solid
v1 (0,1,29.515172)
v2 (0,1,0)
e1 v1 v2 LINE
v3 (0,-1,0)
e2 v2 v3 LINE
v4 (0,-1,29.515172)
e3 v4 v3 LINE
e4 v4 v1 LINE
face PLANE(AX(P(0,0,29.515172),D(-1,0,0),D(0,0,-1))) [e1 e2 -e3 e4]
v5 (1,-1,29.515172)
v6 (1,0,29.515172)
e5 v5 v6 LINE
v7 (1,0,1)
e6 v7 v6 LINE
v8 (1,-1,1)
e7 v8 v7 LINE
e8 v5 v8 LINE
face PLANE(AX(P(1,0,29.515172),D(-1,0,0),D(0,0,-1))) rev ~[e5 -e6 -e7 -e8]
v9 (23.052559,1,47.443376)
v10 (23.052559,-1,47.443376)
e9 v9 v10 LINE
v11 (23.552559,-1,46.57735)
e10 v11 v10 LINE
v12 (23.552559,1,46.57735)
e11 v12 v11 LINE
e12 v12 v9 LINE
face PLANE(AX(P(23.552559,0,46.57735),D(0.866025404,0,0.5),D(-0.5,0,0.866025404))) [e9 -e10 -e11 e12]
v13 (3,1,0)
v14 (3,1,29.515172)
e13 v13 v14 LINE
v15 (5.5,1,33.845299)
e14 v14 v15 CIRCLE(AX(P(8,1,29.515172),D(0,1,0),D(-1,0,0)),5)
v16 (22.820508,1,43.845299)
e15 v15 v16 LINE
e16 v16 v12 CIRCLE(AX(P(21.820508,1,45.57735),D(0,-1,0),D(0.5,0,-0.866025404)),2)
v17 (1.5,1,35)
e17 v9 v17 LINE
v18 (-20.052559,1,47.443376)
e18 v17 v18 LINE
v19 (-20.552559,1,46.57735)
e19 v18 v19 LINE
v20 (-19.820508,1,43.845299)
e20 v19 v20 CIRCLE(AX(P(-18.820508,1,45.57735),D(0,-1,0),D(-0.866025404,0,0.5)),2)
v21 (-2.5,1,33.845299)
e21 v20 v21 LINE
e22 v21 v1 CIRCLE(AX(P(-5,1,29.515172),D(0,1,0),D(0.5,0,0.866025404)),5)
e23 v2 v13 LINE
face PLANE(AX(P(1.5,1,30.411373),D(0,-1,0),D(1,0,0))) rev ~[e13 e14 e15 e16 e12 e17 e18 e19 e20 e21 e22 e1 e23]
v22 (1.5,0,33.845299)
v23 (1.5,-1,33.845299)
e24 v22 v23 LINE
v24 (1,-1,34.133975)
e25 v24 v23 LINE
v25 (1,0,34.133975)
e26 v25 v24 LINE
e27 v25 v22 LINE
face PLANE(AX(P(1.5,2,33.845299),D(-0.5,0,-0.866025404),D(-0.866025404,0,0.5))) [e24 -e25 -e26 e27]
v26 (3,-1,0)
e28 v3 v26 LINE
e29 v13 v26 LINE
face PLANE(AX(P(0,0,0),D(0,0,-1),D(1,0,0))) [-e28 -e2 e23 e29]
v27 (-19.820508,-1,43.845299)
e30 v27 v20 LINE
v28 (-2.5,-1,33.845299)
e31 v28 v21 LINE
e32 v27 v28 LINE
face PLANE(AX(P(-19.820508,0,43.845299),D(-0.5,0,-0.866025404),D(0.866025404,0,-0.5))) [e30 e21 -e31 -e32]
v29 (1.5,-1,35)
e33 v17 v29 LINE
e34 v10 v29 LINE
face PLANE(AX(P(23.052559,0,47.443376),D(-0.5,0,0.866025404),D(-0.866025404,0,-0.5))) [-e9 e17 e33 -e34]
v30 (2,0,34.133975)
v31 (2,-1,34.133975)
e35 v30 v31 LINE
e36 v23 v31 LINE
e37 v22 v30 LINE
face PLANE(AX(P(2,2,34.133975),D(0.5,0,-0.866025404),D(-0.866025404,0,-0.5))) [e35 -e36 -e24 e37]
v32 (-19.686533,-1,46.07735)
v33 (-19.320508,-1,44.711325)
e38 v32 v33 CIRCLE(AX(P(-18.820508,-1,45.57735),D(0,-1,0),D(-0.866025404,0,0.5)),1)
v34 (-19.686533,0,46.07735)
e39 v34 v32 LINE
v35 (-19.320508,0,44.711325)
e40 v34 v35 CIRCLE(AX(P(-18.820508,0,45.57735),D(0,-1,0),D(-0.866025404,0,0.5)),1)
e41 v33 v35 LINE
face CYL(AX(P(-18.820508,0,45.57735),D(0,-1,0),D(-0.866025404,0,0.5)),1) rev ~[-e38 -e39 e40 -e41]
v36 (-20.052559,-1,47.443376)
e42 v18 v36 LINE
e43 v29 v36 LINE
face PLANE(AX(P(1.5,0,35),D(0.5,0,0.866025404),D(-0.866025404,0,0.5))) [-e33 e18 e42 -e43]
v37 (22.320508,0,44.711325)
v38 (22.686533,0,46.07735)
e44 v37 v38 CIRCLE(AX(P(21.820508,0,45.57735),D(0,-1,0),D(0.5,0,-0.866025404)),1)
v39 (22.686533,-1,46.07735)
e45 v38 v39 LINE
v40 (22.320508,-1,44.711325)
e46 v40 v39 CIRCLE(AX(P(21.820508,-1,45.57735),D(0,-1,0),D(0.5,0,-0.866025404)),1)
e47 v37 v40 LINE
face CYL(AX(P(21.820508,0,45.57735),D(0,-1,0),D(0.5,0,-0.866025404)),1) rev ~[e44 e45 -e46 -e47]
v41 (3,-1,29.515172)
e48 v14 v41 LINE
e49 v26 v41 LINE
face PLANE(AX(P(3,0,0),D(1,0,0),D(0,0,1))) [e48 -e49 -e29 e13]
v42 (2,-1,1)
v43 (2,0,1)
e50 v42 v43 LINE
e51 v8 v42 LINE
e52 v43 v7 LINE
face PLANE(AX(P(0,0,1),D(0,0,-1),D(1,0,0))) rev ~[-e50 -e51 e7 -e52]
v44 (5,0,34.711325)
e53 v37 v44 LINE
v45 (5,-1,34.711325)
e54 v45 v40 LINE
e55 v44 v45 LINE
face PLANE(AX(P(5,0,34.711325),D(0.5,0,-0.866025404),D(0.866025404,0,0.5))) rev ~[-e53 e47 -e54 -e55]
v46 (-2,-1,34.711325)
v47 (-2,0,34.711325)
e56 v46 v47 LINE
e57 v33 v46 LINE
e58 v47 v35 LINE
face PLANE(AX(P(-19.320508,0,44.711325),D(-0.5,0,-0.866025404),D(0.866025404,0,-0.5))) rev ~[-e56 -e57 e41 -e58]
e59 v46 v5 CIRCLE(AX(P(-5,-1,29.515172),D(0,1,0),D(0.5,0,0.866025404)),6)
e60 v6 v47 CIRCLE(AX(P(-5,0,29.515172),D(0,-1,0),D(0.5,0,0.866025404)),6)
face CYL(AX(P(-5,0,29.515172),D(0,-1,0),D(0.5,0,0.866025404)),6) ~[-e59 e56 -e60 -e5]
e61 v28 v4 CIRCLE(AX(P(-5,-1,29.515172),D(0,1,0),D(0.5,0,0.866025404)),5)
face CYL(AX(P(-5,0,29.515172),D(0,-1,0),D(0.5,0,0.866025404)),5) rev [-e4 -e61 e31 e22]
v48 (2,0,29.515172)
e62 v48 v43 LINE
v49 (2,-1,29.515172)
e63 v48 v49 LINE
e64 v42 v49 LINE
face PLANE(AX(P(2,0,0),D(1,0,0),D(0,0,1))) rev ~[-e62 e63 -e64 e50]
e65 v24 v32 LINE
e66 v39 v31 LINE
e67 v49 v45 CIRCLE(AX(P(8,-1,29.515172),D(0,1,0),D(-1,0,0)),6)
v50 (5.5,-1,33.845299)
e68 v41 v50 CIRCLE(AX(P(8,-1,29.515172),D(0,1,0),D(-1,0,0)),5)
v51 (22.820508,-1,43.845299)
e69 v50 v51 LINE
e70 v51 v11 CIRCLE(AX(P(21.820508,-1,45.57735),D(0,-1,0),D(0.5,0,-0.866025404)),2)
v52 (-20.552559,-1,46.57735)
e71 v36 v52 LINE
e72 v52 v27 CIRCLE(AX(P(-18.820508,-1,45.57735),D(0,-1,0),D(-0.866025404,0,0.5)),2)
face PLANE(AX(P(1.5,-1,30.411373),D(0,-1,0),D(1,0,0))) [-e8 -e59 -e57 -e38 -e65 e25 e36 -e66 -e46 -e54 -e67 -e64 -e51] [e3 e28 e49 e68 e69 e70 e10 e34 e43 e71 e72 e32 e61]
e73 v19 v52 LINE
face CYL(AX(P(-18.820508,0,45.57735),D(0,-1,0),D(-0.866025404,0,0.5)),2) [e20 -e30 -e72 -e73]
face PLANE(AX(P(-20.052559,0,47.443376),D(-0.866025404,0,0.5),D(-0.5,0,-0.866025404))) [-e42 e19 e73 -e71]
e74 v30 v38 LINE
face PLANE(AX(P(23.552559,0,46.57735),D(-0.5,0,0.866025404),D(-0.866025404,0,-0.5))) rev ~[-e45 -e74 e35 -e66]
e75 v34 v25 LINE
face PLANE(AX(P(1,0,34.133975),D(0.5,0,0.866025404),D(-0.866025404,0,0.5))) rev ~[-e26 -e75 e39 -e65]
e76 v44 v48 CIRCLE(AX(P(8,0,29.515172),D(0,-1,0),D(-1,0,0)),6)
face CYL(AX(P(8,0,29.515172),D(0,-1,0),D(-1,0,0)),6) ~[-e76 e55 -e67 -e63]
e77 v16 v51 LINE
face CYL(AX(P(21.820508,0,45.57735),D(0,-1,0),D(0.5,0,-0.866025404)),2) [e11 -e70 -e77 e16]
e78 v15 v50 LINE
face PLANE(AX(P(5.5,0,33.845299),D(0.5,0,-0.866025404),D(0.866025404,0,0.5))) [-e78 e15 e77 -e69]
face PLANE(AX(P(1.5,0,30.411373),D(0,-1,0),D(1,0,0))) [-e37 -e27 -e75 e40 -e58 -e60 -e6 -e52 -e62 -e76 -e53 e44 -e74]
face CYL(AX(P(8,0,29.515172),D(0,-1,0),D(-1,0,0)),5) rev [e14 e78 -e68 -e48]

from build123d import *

# Parameters (mm, degrees)
F1_DEPTH    = 1
F2_T        = 1
F2_T3_DEPTH = 4


# Not quite as in the source:
# - a shell that OpenCascade refuses in one call is made with other operations: the cavity is built on its own and cut out


with BuildPart() as f1:
    # F0 (on Front) → F1 (new body, symmetric)
    with BuildSketch(Plane.XZ):
        with BuildLine():
            Line((0, 29.5151724427), (0, 0))
            Line((0, 0), (3, 0))
            Line((3, 0), (3, 29.5151724427))
            ThreePointArc((3, 29.5151724427), (3.6698729811, 32.0151724427), (5.5, 33.8452994616))
            Line((5.5, 33.8452994616), (22.8205080757, 43.8452994616))
            ThreePointArc((22.8205080757, 43.8452994616), (23.7523597283, 45.059712179), (23.5525588833, 46.5773502692))
            Line((23.5525588833, 46.5773502692), (23.0525588833, 47.443375673))
            Line((23.0525588833, 47.443375673), (1.5, 35))
            Line((1.5, 35), (-20.0525588833, 47.443375673))
            Line((-20.0525588833, 47.443375673), (-20.5525588833, 46.5773502692))
            ThreePointArc((-20.5525588833, 46.5773502692), (-20.7523597283, 45.059712179), (-19.8205080757, 43.8452994616))
            Line((-19.8205080757, 43.8452994616), (-2.5, 33.8452994616))
            ThreePointArc((-2.5, 33.8452994616), (-0.6698729811, 32.0151724427), (0, 29.5151724427))
        make_face()
    extrude(amount=F1_DEPTH, both=True)

    # F2: shell of thickness 1, made by hand


with BuildPart() as f2_core1:
    # F2_t2: copy of F1
    add(f1.part)

    # the walls: a layer under each face that stays
    f2_faces = [f2_core1.faces().sort_by_distance(p)[0] for p in [
        (12.2762794416, 0, 41.2216878365),
        (23.3025588833, 0, 47.0103629711),
        (23.7523597283, 0, 45.059712179),
        (14.1602540378, 0, 38.8452994616),
        (3.6698729811, 0, 32.0151724427),
        (3, 0, 14.7575862213),
        (1.5, 0, 0),
        (0, 0, 14.7575862213),
        (-0.6698729811, 0, 32.0151724427),
        (-11.1602540378, 0, 38.8452994616),
        (-20.7523597283, 0, 45.059712179),
        (-20.3025588833, 0, 47.0103629711),
        (-9.2762794416, 0, 41.2216878365),
        (1.5, 1, 23.7216878365),
    ]]
    thicken(f2_faces, amount=-F2_T, mode=Mode.SUBTRACT)

    # F2_s4 → F2_t3 (cut)
    with BuildSketch(Plane.XZ.offset(-2)):
        Polygon((1.5, 35.0173205081), (2, 34.1339745962), (1.5, 33.8452994616), (1, 34.1339745962), align=None)
    extrude(amount=F2_T3_DEPTH, mode=Mode.SUBTRACT)


with BuildPart() as f1_1:
    add(f1.part)

    # what is left inside the walls is the cavity
    f2_cavity = [f2_core1.part.solids().sort_by_distance(p)[0] for p in [
        (1.5, -0.01, 16.025783),
    ]]
    add(f2_cavity, mode=Mode.SUBTRACT)


solid = f1_1.part
